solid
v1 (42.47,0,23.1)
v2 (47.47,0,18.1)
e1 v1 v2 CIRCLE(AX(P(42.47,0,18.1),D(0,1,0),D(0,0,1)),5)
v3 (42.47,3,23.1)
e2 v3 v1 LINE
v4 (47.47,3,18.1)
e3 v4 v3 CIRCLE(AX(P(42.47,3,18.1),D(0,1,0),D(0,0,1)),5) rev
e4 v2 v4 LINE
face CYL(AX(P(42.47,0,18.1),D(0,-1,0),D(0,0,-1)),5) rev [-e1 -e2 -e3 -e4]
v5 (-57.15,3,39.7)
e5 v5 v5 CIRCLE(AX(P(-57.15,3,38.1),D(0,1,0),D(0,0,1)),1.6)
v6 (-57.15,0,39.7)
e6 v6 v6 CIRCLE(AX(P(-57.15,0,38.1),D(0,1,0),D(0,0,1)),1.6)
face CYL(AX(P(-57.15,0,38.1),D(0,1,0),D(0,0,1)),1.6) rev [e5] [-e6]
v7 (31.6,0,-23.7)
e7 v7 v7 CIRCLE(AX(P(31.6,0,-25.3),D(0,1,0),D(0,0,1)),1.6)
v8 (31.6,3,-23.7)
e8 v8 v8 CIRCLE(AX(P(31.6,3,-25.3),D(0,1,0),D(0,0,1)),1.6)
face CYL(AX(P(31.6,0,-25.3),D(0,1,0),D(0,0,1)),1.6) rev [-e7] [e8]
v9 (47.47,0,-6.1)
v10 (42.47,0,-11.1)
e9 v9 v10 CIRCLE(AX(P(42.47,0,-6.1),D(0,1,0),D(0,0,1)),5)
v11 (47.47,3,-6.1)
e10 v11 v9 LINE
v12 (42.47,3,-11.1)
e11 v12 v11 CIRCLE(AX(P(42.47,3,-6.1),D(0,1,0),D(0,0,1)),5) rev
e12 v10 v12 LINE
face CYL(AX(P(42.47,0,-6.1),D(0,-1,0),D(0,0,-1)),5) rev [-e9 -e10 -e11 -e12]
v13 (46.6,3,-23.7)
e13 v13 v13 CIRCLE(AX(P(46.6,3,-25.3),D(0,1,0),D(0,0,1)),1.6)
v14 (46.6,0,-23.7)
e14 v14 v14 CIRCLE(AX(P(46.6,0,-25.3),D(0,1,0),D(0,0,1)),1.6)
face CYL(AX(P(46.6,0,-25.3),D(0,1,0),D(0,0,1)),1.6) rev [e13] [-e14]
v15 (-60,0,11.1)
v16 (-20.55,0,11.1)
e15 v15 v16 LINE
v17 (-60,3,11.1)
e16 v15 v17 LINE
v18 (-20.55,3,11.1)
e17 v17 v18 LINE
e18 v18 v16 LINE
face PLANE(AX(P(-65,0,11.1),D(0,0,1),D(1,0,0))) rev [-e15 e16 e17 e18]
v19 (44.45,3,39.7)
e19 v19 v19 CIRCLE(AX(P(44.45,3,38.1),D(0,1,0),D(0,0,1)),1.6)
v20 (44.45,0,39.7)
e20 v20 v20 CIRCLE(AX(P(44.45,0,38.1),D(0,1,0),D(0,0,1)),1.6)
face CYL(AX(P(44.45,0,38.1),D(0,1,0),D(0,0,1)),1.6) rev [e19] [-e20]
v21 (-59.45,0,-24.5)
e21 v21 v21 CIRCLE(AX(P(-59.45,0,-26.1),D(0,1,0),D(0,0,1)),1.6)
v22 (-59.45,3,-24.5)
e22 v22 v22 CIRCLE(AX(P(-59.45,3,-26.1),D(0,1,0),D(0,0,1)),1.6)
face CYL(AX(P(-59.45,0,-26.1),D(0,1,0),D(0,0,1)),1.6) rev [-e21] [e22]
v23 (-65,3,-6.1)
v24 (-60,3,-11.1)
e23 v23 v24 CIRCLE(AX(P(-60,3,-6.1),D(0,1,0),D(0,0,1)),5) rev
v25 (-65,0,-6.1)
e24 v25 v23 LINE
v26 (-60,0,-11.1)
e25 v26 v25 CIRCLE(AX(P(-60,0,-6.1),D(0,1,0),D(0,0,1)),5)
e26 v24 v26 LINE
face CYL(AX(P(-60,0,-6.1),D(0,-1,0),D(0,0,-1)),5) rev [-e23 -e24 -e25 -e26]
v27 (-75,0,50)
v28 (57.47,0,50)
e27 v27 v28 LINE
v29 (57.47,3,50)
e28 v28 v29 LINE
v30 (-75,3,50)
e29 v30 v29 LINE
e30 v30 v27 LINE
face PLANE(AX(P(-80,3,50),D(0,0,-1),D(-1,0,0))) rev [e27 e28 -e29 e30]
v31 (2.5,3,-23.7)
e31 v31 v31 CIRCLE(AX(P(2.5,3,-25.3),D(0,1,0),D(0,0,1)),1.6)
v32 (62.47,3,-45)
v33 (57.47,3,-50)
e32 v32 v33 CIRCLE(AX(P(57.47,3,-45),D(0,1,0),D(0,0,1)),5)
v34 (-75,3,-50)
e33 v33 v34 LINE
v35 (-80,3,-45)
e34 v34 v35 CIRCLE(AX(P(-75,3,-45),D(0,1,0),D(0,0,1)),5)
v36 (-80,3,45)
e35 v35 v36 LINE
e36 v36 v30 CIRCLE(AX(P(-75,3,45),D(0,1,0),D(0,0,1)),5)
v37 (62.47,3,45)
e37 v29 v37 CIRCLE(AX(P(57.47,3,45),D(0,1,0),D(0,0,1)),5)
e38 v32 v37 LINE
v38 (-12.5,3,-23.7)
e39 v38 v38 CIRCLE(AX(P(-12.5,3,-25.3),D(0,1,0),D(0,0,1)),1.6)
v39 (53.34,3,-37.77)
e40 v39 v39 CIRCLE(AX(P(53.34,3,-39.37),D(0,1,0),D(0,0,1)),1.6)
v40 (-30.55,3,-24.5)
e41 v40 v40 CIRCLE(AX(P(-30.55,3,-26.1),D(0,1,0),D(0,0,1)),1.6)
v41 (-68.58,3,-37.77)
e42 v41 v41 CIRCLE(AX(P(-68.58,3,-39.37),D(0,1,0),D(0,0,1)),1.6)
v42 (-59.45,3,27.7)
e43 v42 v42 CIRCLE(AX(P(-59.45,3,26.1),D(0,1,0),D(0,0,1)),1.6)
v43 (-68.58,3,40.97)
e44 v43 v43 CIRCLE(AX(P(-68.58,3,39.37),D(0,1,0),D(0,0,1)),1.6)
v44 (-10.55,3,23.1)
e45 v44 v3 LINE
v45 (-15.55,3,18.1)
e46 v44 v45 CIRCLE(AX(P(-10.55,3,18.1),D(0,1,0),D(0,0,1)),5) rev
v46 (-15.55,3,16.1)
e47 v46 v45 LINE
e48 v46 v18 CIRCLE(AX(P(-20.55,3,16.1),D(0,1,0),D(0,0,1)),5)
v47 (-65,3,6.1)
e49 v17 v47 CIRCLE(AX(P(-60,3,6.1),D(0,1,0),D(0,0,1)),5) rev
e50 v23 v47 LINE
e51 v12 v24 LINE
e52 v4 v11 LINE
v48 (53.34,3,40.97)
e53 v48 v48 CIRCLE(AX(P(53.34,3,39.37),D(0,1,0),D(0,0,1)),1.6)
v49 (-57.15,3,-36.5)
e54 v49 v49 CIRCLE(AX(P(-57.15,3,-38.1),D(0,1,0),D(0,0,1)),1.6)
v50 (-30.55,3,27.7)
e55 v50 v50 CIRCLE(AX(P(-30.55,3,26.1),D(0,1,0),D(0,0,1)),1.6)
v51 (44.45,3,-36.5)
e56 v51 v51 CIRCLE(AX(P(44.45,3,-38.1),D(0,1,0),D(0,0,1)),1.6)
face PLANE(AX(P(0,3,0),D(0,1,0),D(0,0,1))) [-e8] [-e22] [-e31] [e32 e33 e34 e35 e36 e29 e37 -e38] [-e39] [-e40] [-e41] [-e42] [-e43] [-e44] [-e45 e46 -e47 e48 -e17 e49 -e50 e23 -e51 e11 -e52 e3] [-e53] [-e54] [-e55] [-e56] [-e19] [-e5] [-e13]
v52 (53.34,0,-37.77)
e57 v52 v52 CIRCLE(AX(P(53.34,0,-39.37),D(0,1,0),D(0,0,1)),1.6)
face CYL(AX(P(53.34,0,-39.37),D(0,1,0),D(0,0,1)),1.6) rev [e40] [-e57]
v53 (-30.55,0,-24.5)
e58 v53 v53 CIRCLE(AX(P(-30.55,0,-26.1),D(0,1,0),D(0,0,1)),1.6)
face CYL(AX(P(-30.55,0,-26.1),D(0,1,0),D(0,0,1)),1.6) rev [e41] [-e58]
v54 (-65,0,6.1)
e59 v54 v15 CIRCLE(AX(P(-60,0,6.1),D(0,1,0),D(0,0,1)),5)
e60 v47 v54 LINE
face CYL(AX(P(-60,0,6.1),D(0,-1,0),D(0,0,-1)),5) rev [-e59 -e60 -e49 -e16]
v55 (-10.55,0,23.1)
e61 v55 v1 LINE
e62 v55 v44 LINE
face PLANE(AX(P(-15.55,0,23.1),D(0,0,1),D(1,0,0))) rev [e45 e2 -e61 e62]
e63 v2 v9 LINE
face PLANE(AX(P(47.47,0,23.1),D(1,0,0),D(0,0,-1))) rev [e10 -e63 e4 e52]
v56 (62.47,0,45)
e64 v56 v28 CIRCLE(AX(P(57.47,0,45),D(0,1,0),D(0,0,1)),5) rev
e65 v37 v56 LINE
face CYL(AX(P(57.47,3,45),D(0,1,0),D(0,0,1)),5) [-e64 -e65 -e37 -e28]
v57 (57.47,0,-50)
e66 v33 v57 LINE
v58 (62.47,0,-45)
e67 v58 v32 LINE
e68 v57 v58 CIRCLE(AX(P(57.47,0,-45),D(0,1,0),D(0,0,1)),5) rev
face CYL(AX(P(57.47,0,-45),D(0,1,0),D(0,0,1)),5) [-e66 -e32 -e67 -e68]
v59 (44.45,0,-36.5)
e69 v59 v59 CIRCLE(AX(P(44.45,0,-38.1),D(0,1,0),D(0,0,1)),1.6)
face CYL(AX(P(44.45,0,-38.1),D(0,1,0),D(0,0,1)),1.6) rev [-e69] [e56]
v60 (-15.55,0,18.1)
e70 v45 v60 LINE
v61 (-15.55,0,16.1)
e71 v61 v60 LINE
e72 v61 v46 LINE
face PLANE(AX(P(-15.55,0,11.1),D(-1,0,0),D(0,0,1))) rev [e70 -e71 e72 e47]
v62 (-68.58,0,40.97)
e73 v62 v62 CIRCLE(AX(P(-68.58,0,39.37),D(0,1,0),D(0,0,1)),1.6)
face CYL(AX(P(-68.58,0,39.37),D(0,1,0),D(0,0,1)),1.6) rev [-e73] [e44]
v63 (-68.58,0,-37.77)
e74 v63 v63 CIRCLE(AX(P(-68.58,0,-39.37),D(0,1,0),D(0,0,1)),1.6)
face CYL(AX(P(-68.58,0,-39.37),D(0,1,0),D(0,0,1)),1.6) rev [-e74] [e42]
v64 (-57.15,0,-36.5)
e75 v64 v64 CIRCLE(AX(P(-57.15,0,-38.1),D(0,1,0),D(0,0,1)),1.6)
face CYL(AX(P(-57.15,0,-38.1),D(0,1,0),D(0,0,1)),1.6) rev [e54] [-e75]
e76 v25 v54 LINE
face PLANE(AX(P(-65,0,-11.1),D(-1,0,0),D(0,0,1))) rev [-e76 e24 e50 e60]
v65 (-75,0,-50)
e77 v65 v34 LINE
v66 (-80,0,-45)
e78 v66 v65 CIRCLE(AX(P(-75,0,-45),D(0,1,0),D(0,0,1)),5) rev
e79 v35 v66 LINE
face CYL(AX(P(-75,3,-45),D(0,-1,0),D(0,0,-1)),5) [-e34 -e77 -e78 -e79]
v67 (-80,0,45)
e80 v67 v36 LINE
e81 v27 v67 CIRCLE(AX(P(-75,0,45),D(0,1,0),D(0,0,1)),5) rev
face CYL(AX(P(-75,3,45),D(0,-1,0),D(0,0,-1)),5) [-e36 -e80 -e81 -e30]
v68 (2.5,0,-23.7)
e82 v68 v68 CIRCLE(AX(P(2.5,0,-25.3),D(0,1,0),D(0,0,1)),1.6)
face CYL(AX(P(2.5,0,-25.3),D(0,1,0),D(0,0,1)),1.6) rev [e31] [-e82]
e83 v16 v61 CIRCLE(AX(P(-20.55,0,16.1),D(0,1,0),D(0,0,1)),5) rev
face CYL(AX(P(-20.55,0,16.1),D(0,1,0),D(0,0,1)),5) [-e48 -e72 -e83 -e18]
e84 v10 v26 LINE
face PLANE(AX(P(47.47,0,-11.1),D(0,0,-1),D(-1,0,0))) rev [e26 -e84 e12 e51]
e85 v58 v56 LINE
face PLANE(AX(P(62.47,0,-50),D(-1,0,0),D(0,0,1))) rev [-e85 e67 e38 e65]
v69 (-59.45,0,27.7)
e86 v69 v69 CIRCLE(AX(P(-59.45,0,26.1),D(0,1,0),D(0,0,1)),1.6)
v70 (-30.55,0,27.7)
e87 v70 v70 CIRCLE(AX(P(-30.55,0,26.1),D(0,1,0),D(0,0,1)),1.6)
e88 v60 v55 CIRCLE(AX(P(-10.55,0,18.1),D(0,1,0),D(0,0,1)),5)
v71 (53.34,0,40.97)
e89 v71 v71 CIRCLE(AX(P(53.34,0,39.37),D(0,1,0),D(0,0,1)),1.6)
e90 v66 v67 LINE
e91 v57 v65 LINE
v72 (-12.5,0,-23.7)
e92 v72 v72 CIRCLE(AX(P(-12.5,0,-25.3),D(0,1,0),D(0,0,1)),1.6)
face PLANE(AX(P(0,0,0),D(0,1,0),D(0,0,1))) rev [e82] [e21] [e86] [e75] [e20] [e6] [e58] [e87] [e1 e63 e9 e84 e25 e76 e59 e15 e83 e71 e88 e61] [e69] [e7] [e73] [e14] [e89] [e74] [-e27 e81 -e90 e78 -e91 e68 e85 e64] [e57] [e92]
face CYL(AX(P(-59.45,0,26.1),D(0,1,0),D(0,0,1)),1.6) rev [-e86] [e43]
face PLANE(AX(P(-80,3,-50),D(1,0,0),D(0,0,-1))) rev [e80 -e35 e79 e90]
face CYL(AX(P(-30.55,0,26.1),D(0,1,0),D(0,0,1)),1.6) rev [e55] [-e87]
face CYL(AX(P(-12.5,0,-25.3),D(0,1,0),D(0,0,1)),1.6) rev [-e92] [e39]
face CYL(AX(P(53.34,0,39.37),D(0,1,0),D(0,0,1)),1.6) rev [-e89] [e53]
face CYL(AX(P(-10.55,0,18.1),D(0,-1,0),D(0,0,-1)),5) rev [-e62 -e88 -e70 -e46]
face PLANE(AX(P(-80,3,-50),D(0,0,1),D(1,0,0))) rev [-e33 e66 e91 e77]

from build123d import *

# Parameters (mm, degrees)
SKETCH1_W                 = 160
SKETCH1_H                 = 100
BOSS_EXTRUDE1_DEPTH       = 3
SKETCH5_R                 = 1.6
CUT_EXTRUDE1_DEPTH        = 95.387499172
SKETCH_PATTERN1_OUTLINE_R = 1.6
SKETCH_PATTERN1_DEPTH     = 3
ZONA_GPIOS_W              = 17.53
ZONA_GPIOS_H              = 100
ZONAGPIOS_DEPTH           = 95.387499172
CUT_EXTRUDE4_DEPTH        = 95.387499172
FILLET1_R                 = 5


# Read off the part's stored shape, not the designer's step: Sketch-Pattern1
with BuildPart() as part:
    # Sketch1 → Boss-Extrude1 (new body)
    with BuildSketch(Plane(origin=(0, 0, 0), x_dir=(1, 0, 0), z_dir=(0, 1, 0))):
        Rectangle(SKETCH1_W, SKETCH1_H)
    extrude(amount=BOSS_EXTRUDE1_DEPTH)

    # Sketch5 → Cut-Extrude1 (cut, through all)
    with BuildSketch(Plane(origin=(0, 3, 0), x_dir=(1, 0, 0), z_dir=(0, 1, 0))):
        with Locations(Location((-68.58, 39.37, 0), (0, 0, 270))):
            Circle(SKETCH5_R)
    extrude(amount=-CUT_EXTRUDE1_DEPTH, mode=Mode.SUBTRACT)

    # Sketch-Pattern1 outline → Sketch-Pattern1 (cut)
    with BuildSketch(Plane(origin=(0, 0, 0), x_dir=(1, 0, 0), z_dir=(0, 1, 0))):
        with Locations((46.6, 25.3)):
            Circle(SKETCH_PATTERN1_OUTLINE_R)
        with Locations((-57.15, 38.1)):
            Circle(SKETCH_PATTERN1_OUTLINE_R)
        with Locations((-57.15, -38.1)):
            Circle(SKETCH_PATTERN1_OUTLINE_R)
        with Locations((44.45, -38.1)):
            Circle(SKETCH_PATTERN1_OUTLINE_R)
        with Locations((53.34, 39.37)):
            Circle(SKETCH_PATTERN1_OUTLINE_R)
        with Locations((53.34, -39.37)):
            Circle(SKETCH_PATTERN1_OUTLINE_R)
        with Locations((44.45, 38.1)):
            Circle(SKETCH_PATTERN1_OUTLINE_R)
        with Locations((-68.58, -39.37)):
            Circle(SKETCH_PATTERN1_OUTLINE_R)
        with Locations((-59.45, -26.1)):
            Circle(SKETCH_PATTERN1_OUTLINE_R)
        with Locations((-30.55, -26.1)):
            Circle(SKETCH_PATTERN1_OUTLINE_R)
        with Locations((-30.55, 26.1)):
            Circle(SKETCH_PATTERN1_OUTLINE_R)
        with Locations((-59.45, 26.1)):
            Circle(SKETCH_PATTERN1_OUTLINE_R)
        with Locations((-12.5, 25.3)):
            Circle(SKETCH_PATTERN1_OUTLINE_R)
        with Locations((2.5, 25.3)):
            Circle(SKETCH_PATTERN1_OUTLINE_R)
        with Locations((31.6, 25.3)):
            Circle(SKETCH_PATTERN1_OUTLINE_R)
    extrude(amount=SKETCH_PATTERN1_DEPTH, mode=Mode.SUBTRACT)

    # zona gpios → ZonaGPIOS (cut, through all)
    with BuildSketch(Plane(origin=(0, 3, 0), x_dir=(1, 0, 0), z_dir=(0, 1, 0))):
        with Locations((71.235, 0)):
            Rectangle(ZONA_GPIOS_W, ZONA_GPIOS_H)
    extrude(amount=-ZONAGPIOS_DEPTH, mode=Mode.SUBTRACT)

    # Sketch11 → Cut-Extrude4 (cut, through all)
    with BuildSketch(Plane(origin=(0, 3, 0), x_dir=(1, 0, 0), z_dir=(0, 1, 0))):
        Polygon((47.47, -23.1), (47.47, 11.1), (-65, 11.1), (-65, -11.1), (-15.55, -11.1), (-15.55, -23.1), align=None)
    extrude(amount=-CUT_EXTRUDE4_DEPTH, mode=Mode.SUBTRACT)

    # Fillet1
    fillet1_edges = [part.edges().sort_by_distance(p)[0] for p in [
        (47.47, 1.5, 23.1),
        (-15.55, 1.5, 23.1),
        (-15.55, 1.5, 11.1),
        (-65, 1.5, 11.1),
        (-65, 1.5, -11.1),
        (47.47, 1.5, -11.1),
        (-80, 1.5, 50),
        (-80, 1.5, -50),
        (62.47, 1.5, 50),
        (62.47, 1.5, -50),
    ]]
    fillet(fillet1_edges, radius=FILLET1_R)


solid = part.part
